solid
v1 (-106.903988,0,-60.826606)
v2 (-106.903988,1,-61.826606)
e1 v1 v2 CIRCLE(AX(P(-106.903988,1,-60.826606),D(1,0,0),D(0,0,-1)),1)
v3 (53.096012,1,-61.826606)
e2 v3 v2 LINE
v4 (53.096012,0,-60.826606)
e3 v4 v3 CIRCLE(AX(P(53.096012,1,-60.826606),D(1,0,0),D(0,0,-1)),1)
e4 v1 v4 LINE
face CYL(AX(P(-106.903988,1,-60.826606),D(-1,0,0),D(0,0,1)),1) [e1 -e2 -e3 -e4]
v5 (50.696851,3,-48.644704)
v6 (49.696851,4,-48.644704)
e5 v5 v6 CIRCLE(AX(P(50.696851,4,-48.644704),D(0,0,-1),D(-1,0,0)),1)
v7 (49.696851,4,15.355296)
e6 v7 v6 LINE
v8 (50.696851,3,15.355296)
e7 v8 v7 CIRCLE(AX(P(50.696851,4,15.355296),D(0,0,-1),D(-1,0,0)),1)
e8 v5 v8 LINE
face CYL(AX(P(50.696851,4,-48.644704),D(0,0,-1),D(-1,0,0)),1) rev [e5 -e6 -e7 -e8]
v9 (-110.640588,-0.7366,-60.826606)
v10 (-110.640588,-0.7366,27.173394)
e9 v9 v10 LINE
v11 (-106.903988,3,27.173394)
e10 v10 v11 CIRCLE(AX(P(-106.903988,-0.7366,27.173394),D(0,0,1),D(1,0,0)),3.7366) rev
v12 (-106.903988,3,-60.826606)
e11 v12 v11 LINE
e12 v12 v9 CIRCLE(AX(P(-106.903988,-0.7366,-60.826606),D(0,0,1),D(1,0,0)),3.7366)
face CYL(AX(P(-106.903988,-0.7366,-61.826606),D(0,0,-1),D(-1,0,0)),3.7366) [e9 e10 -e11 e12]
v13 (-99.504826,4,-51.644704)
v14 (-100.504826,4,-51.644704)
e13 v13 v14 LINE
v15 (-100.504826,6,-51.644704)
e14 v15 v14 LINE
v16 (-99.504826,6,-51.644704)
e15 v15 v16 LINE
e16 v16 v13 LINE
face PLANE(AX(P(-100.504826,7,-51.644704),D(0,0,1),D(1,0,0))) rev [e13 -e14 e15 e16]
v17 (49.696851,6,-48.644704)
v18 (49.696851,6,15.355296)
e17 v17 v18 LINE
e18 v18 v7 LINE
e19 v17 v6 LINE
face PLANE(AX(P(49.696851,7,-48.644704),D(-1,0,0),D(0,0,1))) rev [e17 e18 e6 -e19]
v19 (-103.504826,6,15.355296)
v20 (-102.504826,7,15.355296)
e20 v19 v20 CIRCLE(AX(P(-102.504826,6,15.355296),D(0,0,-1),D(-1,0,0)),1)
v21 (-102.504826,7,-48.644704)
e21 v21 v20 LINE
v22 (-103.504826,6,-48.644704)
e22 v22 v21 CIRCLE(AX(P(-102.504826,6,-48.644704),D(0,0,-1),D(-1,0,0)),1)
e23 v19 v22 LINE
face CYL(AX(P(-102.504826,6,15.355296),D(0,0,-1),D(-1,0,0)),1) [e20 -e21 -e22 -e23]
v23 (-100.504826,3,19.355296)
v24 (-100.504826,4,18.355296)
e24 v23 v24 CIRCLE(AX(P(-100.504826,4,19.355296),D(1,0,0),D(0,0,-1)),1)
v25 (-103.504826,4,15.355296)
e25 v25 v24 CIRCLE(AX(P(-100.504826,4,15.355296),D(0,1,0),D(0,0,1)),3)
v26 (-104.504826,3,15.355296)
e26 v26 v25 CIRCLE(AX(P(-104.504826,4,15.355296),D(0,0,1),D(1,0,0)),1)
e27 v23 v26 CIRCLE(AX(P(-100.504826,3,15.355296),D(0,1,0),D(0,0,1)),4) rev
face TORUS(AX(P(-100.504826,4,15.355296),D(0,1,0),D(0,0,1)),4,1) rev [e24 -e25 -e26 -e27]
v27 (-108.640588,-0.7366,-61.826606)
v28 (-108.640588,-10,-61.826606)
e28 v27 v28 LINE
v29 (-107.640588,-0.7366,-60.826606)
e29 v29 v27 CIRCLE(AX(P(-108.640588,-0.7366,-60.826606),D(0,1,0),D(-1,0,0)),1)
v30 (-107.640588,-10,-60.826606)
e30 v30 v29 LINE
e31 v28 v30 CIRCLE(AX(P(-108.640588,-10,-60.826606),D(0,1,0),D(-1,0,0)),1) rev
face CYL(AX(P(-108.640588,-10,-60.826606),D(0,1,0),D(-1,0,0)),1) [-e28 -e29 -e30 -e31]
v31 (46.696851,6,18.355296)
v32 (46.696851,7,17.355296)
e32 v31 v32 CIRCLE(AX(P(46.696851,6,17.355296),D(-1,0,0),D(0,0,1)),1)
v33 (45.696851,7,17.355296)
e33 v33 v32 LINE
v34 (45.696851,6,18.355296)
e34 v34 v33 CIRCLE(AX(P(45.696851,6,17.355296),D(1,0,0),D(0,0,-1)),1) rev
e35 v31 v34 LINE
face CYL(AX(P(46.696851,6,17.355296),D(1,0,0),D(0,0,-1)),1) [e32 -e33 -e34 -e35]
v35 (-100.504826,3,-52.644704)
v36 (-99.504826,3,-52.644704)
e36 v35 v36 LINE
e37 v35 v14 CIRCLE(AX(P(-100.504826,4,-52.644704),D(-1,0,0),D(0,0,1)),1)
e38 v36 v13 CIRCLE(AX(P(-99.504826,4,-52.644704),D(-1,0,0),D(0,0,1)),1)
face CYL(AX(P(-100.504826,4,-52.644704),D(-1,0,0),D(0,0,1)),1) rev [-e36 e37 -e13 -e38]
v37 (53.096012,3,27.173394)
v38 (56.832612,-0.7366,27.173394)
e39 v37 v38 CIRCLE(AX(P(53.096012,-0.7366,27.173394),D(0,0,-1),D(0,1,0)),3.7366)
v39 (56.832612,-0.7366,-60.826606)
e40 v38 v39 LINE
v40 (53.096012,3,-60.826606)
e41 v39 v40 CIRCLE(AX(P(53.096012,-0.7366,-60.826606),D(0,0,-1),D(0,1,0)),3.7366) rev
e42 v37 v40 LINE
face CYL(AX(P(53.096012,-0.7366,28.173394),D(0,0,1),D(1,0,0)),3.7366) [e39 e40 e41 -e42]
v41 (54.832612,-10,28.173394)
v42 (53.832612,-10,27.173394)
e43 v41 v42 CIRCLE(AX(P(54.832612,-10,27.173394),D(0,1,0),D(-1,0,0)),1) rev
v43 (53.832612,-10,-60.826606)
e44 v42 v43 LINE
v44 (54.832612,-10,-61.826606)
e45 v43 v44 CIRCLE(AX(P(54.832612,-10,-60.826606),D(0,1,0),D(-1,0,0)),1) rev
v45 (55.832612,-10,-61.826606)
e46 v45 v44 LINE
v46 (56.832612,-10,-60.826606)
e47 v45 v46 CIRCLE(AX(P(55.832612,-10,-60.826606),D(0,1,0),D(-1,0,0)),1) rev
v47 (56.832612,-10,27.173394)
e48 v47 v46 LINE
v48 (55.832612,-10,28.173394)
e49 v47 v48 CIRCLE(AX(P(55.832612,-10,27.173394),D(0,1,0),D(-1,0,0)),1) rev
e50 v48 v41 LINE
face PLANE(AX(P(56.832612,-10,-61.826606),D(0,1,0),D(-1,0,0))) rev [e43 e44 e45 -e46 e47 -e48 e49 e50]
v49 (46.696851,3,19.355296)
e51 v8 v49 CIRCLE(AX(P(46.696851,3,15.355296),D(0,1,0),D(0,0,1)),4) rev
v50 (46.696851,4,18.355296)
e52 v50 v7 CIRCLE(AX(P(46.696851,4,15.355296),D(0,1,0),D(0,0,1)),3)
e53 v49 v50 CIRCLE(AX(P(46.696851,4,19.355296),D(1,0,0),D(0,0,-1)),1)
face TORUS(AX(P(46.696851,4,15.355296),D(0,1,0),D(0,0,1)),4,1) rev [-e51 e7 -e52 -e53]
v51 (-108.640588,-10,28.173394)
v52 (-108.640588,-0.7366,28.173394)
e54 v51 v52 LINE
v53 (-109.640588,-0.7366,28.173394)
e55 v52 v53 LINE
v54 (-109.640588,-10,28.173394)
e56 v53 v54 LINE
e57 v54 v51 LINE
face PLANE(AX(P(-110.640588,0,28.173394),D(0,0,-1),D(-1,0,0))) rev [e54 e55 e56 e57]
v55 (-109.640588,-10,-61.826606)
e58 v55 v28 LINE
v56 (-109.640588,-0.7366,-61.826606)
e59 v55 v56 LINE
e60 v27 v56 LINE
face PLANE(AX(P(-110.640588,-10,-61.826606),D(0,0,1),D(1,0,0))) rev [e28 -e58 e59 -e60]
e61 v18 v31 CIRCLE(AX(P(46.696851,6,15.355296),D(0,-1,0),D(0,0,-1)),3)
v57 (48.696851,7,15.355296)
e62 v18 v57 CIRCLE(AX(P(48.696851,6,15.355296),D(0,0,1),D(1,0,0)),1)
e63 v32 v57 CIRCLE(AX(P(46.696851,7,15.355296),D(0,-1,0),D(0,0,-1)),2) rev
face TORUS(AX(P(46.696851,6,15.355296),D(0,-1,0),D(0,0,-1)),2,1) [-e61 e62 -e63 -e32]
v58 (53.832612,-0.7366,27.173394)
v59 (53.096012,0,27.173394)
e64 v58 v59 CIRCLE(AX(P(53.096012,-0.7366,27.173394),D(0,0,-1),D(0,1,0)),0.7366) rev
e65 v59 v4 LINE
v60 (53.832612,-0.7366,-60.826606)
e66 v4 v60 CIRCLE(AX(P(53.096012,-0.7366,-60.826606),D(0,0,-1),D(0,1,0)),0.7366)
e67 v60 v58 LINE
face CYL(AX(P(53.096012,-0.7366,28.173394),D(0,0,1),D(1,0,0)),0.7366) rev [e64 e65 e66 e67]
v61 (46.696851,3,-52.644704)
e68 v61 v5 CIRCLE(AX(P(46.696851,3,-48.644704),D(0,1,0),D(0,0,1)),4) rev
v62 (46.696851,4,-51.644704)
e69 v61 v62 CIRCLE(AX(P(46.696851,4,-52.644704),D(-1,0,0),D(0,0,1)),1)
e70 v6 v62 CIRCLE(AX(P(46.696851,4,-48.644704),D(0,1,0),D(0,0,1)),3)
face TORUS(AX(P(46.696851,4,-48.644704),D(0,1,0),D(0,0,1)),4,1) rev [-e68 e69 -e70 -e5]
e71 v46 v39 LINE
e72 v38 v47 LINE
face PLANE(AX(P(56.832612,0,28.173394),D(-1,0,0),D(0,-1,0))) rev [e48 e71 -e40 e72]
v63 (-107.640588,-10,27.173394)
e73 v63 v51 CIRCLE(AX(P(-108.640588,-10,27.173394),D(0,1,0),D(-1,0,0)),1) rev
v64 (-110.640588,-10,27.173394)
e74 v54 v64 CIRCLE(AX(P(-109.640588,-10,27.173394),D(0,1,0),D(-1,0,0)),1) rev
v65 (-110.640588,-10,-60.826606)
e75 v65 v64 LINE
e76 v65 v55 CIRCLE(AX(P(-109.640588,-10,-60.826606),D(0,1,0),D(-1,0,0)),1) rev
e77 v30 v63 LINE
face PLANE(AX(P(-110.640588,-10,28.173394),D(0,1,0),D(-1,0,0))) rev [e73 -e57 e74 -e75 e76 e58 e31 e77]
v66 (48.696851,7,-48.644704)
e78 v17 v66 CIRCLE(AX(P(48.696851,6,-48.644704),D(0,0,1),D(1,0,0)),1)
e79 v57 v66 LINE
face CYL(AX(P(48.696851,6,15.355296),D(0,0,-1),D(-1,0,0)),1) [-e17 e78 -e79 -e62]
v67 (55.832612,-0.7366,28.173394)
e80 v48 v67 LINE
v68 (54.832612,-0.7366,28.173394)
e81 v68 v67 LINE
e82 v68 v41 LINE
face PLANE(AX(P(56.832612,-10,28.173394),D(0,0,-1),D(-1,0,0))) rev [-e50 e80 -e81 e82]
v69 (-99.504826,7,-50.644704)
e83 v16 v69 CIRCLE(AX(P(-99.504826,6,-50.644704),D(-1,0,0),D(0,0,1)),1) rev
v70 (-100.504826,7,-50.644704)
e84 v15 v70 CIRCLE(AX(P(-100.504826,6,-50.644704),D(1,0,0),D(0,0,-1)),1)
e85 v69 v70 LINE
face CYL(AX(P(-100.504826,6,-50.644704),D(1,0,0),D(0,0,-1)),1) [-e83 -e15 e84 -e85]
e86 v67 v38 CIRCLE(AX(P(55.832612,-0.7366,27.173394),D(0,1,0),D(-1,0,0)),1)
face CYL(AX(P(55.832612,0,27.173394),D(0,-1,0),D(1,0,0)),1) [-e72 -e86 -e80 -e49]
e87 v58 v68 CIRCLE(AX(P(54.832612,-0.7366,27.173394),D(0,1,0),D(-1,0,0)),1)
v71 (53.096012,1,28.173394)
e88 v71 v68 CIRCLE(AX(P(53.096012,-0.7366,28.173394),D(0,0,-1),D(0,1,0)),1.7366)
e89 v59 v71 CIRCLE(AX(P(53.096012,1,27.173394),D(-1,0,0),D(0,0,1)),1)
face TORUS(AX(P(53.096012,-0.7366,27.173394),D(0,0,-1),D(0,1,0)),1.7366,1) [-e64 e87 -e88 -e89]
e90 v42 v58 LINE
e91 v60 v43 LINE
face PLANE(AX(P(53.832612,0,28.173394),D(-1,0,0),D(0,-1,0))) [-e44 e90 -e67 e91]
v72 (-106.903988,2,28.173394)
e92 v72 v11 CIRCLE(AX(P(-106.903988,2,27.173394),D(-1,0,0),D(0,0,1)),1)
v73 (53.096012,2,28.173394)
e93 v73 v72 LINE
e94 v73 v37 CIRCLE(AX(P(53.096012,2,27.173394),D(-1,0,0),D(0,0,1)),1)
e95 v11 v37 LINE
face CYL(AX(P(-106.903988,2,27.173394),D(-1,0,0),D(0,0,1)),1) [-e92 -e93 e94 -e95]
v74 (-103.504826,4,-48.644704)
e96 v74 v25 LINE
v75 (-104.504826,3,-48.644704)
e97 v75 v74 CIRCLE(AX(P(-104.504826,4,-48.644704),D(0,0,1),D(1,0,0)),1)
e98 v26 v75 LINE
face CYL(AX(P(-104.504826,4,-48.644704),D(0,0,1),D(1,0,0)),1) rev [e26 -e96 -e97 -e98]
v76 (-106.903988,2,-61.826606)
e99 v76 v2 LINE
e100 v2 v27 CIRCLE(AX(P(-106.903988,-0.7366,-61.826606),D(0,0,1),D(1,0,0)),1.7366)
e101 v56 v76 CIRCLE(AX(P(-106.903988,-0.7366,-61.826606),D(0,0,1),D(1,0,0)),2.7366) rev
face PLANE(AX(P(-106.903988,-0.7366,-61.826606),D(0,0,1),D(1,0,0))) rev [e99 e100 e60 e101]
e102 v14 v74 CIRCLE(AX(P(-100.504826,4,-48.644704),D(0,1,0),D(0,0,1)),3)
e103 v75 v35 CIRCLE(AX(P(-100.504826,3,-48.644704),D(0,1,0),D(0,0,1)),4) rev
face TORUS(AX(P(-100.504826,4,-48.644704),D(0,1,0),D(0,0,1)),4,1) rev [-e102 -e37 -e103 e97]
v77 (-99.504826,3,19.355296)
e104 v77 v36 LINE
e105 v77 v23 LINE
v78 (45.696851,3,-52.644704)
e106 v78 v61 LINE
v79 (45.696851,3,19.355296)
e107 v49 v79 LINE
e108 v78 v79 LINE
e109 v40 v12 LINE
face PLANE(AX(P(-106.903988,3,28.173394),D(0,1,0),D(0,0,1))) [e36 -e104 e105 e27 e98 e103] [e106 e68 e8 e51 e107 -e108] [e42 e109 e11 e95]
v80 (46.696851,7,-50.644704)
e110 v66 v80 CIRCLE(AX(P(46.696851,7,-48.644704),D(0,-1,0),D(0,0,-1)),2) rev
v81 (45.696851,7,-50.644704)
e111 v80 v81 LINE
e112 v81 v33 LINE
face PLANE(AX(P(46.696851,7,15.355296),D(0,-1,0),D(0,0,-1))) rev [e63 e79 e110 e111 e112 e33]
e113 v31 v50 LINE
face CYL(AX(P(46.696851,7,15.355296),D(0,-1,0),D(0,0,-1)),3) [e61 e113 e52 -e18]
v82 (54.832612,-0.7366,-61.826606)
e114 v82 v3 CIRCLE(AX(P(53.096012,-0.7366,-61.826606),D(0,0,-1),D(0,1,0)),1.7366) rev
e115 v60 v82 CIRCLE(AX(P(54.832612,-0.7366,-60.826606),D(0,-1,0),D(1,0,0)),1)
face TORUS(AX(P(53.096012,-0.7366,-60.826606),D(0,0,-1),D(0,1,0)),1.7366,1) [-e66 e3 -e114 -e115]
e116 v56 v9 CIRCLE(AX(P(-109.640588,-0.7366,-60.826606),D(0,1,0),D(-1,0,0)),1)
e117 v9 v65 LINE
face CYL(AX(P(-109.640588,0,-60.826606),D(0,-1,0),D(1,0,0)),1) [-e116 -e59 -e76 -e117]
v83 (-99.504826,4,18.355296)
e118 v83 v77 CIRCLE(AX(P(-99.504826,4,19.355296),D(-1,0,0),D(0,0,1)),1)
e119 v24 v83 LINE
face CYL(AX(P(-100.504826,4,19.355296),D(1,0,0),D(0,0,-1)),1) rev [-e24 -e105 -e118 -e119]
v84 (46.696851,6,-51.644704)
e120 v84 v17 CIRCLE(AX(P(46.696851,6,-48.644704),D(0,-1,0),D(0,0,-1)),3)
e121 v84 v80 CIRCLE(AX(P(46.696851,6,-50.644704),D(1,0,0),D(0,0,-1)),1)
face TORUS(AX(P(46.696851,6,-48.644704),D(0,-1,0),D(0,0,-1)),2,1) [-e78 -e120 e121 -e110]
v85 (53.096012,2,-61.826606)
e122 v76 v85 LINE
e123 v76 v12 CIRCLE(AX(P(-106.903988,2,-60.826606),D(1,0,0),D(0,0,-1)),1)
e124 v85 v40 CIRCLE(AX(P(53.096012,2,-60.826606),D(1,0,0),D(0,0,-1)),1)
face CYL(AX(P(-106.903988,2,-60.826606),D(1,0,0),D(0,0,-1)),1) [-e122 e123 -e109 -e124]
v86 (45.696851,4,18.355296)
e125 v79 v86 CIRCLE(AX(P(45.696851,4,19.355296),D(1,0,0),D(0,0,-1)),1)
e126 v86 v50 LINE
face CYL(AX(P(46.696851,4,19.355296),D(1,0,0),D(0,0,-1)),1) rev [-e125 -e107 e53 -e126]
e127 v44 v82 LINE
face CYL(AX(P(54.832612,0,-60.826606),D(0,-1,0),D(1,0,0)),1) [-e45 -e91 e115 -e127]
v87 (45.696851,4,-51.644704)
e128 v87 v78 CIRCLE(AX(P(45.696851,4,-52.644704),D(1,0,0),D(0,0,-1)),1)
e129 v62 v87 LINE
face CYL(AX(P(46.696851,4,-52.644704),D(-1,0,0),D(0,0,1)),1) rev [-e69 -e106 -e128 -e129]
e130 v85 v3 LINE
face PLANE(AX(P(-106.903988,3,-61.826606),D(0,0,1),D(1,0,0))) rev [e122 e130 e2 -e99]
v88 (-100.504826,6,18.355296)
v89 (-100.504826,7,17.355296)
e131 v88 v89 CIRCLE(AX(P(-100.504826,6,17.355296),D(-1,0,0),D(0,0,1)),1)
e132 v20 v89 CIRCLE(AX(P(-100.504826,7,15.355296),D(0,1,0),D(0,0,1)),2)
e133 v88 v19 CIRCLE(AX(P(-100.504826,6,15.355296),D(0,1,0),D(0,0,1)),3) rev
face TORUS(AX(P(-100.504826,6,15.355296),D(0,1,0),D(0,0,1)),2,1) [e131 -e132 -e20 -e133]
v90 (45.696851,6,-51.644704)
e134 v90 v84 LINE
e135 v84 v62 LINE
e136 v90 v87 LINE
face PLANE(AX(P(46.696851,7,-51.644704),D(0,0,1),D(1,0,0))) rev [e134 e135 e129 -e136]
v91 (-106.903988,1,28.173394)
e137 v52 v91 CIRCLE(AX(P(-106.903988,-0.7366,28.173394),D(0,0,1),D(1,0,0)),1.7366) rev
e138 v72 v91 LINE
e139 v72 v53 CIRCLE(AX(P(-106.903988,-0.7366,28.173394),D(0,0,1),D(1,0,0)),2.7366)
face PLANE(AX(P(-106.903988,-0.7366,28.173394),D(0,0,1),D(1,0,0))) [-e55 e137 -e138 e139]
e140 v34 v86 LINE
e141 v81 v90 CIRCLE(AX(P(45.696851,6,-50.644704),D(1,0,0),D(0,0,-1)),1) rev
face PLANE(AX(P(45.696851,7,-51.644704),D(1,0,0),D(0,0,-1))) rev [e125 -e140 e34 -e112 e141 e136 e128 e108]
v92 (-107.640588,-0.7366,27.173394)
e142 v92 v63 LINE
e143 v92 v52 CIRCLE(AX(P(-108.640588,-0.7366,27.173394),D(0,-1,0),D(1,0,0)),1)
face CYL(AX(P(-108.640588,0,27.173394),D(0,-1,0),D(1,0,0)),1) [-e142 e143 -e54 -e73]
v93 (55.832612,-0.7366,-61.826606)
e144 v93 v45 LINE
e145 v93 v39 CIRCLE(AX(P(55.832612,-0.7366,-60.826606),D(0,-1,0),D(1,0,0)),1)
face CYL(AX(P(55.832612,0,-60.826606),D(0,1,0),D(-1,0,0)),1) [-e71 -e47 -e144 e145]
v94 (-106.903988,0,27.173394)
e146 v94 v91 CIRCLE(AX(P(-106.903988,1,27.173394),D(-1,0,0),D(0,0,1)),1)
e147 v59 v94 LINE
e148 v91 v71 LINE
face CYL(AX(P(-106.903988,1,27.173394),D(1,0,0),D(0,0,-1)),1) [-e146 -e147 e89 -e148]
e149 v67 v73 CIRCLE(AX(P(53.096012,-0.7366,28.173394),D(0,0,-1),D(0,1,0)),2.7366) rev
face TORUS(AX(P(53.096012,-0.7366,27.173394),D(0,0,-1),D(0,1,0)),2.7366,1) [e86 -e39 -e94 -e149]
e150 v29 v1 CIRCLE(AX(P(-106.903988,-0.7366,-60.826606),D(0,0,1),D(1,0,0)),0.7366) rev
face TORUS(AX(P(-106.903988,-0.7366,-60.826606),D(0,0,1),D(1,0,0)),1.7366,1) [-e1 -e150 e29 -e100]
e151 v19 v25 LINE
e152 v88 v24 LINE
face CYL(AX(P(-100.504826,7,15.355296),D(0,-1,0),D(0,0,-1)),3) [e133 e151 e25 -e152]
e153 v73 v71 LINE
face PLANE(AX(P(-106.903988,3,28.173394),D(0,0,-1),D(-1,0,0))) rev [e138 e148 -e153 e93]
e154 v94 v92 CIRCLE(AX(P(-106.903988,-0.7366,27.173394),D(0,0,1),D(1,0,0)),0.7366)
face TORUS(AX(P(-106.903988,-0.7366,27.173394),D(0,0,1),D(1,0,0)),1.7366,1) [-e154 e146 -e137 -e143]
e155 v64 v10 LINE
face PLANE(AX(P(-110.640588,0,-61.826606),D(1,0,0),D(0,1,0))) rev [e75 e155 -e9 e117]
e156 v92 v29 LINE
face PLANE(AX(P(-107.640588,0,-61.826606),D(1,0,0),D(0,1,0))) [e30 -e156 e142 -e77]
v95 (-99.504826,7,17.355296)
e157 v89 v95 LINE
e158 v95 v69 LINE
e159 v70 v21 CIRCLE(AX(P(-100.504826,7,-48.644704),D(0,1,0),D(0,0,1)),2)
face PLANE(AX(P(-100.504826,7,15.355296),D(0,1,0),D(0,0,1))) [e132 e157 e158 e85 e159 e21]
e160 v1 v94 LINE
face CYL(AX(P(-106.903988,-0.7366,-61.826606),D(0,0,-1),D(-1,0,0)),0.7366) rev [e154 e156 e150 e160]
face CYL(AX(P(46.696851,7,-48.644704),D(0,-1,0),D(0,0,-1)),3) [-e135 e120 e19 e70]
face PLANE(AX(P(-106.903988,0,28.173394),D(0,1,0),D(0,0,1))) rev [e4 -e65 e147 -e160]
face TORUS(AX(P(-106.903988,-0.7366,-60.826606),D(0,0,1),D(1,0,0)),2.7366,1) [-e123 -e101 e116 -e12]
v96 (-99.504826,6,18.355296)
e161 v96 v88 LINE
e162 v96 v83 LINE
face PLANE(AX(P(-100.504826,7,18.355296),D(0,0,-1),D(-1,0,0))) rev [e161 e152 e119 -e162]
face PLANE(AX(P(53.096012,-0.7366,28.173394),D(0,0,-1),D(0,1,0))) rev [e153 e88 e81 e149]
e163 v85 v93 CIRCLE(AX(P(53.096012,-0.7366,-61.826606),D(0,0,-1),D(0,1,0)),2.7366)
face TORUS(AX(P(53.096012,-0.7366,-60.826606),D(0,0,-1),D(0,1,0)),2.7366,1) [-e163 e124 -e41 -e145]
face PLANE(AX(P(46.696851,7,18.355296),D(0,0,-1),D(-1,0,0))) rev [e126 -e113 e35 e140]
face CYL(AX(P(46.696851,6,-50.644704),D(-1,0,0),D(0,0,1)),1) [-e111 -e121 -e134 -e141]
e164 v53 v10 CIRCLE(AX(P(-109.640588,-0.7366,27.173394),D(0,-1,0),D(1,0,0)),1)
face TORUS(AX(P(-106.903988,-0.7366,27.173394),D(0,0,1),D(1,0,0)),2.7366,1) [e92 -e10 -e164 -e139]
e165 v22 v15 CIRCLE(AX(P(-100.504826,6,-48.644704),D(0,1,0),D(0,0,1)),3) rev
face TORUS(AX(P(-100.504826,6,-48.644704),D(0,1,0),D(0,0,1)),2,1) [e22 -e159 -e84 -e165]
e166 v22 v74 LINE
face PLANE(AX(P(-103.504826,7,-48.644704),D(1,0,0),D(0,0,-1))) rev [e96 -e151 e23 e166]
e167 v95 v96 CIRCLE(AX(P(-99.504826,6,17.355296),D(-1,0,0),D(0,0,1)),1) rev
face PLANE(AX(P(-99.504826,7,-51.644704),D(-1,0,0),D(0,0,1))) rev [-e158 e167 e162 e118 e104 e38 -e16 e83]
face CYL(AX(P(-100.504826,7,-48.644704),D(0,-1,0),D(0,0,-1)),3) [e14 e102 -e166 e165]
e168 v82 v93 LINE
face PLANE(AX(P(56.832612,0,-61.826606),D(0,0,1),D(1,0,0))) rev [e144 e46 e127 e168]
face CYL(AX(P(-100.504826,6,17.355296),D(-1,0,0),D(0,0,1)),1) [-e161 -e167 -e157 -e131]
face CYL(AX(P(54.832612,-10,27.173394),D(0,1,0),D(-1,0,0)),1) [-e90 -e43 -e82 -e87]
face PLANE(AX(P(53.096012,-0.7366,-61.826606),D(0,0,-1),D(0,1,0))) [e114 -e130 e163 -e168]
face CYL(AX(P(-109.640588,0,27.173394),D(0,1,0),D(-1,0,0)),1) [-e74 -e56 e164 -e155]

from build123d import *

# Parameters (mm, degrees)
ESQUISSE1_W                 = 160
ESQUISSE1_H                 = 90
T_LE_DE_BASE_PLI_E1_DEPTH   = 3
T_LE_PLI_E_SUR_AR_TE1_DEPTH = 90
T_LE_PLI_E_SUR_AR_TE2_DEPTH = 90
EXTRUSION1_DEPTH            = 4
CONG_2_R                    = 1
CONG_3_R                    = 1
CONG_4_R                    = 1


# Sheet-metal steps are written as plain solids
with BuildPart() as part:
    # Esquisse1 → Tôle de base pliée1 (new body)
    with BuildSketch(Plane(origin=(0, 0, 0), x_dir=(1, 0, 0), z_dir=(0, 1, 0))):
        with Locations((-26.903987823, 16.826605784)):
            Rectangle(ESQUISSE1_W, ESQUISSE1_H)
    extrude(amount=T_LE_DE_BASE_PLI_E1_DEPTH)

    # Tôle pliée sur arête1 section (across the edge) → Tôle pliée sur arête1 (add)
    with BuildSketch(Plane(origin=(53.832612177, 0, -61.826605784), x_dir=(-1, 0, 0), z_dir=(0, 0, 1))):
        with BuildLine():
            Line((-3, 0.7366), (-3, 10))
            Line((-3, 10), (0, 10))
            Line((0, 10), (0, 0.7366))
            ThreePointArc((0, 0.7366), (0.215745145, 0.215745145), (0.7366, 0))
            Line((0.7366, 0), (0.7366, -3))
            ThreePointArc((0.7366, -3), (-1.905575199, -1.905575199), (-3, 0.7366))
        make_face()
    extrude(amount=T_LE_PLI_E_SUR_AR_TE1_DEPTH)

    # Tôle pliée sur arête2 section (across the edge) → Tôle pliée sur arête2 (add)
    with BuildSketch(Plane(origin=(-107.640587823, 0, 28.173394216), x_dir=(1, 0, 0), z_dir=(0, 0, -1))):
        with BuildLine():
            Line((-3, 0.7366), (-3, 10))
            Line((-3, 10), (0, 10))
            Line((0, 10), (0, 0.7366))
            ThreePointArc((0, 0.7366), (0.215745145, 0.215745145), (0.7366, 0))
            Line((0.7366, 0), (0.7366, -3))
            ThreePointArc((0.7366, -3), (-1.905575199, -1.905575199), (-3, 0.7366))
        make_face()
    extrude(amount=T_LE_PLI_E_SUR_AR_TE2_DEPTH)

    # Esquisse9 → Extrusion1 (add)
    with BuildSketch(Plane(origin=(0, 3, 0), x_dir=(1, 0, 0), z_dir=(0, 1, 0))):
        with BuildLine():
            Line((-100.504826498, 51.644704016), (-99.504826498, 51.644704016))
            Line((-99.504826498, 51.644704016), (-99.504826498, -18.355295984))
            Line((-99.504826498, -18.355295984), (-100.504826498, -18.355295984))
            ThreePointArc((-100.504826498, -18.355295984), (-102.626146841, -17.476616327), (-103.504826498, -15.355295984))
            Line((-103.504826498, -15.355295984), (-103.504826498, 48.644704016))
            ThreePointArc((-103.504826498, 48.644704016), (-102.626146841, 50.76602436), (-100.504826498, 51.644704016))
        make_face()
        with BuildLine():
            Line((45.696850851, 51.644704016), (45.696850851, -18.355295984))
            Line((45.696850851, -18.355295984), (46.696850851, -18.355295984))
            ThreePointArc((46.696850851, -18.355295984), (48.818171195, -17.476616327), (49.696850851, -15.355295984))
            Line((49.696850851, -15.355295984), (49.696850851, 48.644704016))
            ThreePointArc((49.696850851, 48.644704016), (48.818171195, 50.76602436), (46.696850851, 51.644704016))
            Line((46.696850851, 51.644704016), (45.696850851, 51.644704016))
        make_face()
    extrude(amount=EXTRUSION1_DEPTH)

    # Congé2
    cong_2_edges = [part.edges().sort_by_distance(p)[0] for p in [
        (-26.903987823, 3, -61.826605784),
        (55.738187375, 1.905575199, -61.826605784),
        (55.738187375, 1.905575199, 28.173394216),
        (53.616867032, -0.215745145, -61.826605784),
        (53.616867032, -0.215745145, 28.173394216),
        (53.832612177, -5.3683, 28.173394216),
        (53.832612177, -5.3683, -61.826605784),
        (56.832612177, -5.3683, 28.173394216),
        (56.832612177, -5.3683, -61.826605784),
        (-109.546163022, 1.905575199, 28.173394216),
        (-109.546163022, 1.905575199, -61.826605784),
        (-107.424842678, -0.215745145, 28.173394216),
        (-107.424842678, -0.215745145, -61.826605784),
        (-26.903987823, 0, -61.826605784),
        (-107.640587823, -5.3683, -61.826605784),
        (-107.640587823, -5.3683, 28.173394216),
        (-110.640587823, -5.3683, -61.826605784),
        (-110.640587823, -5.3683, 28.173394216),
        (-26.903987823, 0, 28.173394216),
        (-26.903987823, 3, 28.173394216),
    ]]
    fillet(cong_2_edges, radius=CONG_2_R)

    # Congé3
    cong_3_edges = [part.edges().sort_by_distance(p)[0] for p in [
        (-100.004826498, 7, -51.644704016),
        (-102.626146841, 7, -50.76602436),
        (-103.504826498, 7, -16.644704016),
        (-102.626146841, 7, 17.476616327),
        (-100.004826498, 7, 18.355295984),
        (48.818171195, 7, 17.476616327),
        (49.696850851, 7, -16.644704016),
        (48.818171195, 7, -50.76602436),
        (46.196850851, 7, -51.644704016),
        (46.196850851, 7, 18.355295984),
    ]]
    fillet(cong_3_edges, radius=CONG_3_R)

    # Congé4
    cong_4_edges = [part.edges().sort_by_distance(p)[0] for p in [
        (-100.004826498, 3, -51.644704016),
        (-102.626146841, 3, -50.76602436),
        (-103.504826498, 3, -16.644704016),
        (-102.626146841, 3, 17.476616327),
        (-100.004826498, 3, 18.355295984),
        (48.818171195, 3, 17.476616327),
        (49.696850851, 3, -16.644704016),
        (48.818171195, 3, -50.76602436),
        (46.196850851, 3, -51.644704016),
        (46.196850851, 3, 18.355295984),
    ]]
    fillet(cong_4_edges, radius=CONG_4_R)


solid = part.part
